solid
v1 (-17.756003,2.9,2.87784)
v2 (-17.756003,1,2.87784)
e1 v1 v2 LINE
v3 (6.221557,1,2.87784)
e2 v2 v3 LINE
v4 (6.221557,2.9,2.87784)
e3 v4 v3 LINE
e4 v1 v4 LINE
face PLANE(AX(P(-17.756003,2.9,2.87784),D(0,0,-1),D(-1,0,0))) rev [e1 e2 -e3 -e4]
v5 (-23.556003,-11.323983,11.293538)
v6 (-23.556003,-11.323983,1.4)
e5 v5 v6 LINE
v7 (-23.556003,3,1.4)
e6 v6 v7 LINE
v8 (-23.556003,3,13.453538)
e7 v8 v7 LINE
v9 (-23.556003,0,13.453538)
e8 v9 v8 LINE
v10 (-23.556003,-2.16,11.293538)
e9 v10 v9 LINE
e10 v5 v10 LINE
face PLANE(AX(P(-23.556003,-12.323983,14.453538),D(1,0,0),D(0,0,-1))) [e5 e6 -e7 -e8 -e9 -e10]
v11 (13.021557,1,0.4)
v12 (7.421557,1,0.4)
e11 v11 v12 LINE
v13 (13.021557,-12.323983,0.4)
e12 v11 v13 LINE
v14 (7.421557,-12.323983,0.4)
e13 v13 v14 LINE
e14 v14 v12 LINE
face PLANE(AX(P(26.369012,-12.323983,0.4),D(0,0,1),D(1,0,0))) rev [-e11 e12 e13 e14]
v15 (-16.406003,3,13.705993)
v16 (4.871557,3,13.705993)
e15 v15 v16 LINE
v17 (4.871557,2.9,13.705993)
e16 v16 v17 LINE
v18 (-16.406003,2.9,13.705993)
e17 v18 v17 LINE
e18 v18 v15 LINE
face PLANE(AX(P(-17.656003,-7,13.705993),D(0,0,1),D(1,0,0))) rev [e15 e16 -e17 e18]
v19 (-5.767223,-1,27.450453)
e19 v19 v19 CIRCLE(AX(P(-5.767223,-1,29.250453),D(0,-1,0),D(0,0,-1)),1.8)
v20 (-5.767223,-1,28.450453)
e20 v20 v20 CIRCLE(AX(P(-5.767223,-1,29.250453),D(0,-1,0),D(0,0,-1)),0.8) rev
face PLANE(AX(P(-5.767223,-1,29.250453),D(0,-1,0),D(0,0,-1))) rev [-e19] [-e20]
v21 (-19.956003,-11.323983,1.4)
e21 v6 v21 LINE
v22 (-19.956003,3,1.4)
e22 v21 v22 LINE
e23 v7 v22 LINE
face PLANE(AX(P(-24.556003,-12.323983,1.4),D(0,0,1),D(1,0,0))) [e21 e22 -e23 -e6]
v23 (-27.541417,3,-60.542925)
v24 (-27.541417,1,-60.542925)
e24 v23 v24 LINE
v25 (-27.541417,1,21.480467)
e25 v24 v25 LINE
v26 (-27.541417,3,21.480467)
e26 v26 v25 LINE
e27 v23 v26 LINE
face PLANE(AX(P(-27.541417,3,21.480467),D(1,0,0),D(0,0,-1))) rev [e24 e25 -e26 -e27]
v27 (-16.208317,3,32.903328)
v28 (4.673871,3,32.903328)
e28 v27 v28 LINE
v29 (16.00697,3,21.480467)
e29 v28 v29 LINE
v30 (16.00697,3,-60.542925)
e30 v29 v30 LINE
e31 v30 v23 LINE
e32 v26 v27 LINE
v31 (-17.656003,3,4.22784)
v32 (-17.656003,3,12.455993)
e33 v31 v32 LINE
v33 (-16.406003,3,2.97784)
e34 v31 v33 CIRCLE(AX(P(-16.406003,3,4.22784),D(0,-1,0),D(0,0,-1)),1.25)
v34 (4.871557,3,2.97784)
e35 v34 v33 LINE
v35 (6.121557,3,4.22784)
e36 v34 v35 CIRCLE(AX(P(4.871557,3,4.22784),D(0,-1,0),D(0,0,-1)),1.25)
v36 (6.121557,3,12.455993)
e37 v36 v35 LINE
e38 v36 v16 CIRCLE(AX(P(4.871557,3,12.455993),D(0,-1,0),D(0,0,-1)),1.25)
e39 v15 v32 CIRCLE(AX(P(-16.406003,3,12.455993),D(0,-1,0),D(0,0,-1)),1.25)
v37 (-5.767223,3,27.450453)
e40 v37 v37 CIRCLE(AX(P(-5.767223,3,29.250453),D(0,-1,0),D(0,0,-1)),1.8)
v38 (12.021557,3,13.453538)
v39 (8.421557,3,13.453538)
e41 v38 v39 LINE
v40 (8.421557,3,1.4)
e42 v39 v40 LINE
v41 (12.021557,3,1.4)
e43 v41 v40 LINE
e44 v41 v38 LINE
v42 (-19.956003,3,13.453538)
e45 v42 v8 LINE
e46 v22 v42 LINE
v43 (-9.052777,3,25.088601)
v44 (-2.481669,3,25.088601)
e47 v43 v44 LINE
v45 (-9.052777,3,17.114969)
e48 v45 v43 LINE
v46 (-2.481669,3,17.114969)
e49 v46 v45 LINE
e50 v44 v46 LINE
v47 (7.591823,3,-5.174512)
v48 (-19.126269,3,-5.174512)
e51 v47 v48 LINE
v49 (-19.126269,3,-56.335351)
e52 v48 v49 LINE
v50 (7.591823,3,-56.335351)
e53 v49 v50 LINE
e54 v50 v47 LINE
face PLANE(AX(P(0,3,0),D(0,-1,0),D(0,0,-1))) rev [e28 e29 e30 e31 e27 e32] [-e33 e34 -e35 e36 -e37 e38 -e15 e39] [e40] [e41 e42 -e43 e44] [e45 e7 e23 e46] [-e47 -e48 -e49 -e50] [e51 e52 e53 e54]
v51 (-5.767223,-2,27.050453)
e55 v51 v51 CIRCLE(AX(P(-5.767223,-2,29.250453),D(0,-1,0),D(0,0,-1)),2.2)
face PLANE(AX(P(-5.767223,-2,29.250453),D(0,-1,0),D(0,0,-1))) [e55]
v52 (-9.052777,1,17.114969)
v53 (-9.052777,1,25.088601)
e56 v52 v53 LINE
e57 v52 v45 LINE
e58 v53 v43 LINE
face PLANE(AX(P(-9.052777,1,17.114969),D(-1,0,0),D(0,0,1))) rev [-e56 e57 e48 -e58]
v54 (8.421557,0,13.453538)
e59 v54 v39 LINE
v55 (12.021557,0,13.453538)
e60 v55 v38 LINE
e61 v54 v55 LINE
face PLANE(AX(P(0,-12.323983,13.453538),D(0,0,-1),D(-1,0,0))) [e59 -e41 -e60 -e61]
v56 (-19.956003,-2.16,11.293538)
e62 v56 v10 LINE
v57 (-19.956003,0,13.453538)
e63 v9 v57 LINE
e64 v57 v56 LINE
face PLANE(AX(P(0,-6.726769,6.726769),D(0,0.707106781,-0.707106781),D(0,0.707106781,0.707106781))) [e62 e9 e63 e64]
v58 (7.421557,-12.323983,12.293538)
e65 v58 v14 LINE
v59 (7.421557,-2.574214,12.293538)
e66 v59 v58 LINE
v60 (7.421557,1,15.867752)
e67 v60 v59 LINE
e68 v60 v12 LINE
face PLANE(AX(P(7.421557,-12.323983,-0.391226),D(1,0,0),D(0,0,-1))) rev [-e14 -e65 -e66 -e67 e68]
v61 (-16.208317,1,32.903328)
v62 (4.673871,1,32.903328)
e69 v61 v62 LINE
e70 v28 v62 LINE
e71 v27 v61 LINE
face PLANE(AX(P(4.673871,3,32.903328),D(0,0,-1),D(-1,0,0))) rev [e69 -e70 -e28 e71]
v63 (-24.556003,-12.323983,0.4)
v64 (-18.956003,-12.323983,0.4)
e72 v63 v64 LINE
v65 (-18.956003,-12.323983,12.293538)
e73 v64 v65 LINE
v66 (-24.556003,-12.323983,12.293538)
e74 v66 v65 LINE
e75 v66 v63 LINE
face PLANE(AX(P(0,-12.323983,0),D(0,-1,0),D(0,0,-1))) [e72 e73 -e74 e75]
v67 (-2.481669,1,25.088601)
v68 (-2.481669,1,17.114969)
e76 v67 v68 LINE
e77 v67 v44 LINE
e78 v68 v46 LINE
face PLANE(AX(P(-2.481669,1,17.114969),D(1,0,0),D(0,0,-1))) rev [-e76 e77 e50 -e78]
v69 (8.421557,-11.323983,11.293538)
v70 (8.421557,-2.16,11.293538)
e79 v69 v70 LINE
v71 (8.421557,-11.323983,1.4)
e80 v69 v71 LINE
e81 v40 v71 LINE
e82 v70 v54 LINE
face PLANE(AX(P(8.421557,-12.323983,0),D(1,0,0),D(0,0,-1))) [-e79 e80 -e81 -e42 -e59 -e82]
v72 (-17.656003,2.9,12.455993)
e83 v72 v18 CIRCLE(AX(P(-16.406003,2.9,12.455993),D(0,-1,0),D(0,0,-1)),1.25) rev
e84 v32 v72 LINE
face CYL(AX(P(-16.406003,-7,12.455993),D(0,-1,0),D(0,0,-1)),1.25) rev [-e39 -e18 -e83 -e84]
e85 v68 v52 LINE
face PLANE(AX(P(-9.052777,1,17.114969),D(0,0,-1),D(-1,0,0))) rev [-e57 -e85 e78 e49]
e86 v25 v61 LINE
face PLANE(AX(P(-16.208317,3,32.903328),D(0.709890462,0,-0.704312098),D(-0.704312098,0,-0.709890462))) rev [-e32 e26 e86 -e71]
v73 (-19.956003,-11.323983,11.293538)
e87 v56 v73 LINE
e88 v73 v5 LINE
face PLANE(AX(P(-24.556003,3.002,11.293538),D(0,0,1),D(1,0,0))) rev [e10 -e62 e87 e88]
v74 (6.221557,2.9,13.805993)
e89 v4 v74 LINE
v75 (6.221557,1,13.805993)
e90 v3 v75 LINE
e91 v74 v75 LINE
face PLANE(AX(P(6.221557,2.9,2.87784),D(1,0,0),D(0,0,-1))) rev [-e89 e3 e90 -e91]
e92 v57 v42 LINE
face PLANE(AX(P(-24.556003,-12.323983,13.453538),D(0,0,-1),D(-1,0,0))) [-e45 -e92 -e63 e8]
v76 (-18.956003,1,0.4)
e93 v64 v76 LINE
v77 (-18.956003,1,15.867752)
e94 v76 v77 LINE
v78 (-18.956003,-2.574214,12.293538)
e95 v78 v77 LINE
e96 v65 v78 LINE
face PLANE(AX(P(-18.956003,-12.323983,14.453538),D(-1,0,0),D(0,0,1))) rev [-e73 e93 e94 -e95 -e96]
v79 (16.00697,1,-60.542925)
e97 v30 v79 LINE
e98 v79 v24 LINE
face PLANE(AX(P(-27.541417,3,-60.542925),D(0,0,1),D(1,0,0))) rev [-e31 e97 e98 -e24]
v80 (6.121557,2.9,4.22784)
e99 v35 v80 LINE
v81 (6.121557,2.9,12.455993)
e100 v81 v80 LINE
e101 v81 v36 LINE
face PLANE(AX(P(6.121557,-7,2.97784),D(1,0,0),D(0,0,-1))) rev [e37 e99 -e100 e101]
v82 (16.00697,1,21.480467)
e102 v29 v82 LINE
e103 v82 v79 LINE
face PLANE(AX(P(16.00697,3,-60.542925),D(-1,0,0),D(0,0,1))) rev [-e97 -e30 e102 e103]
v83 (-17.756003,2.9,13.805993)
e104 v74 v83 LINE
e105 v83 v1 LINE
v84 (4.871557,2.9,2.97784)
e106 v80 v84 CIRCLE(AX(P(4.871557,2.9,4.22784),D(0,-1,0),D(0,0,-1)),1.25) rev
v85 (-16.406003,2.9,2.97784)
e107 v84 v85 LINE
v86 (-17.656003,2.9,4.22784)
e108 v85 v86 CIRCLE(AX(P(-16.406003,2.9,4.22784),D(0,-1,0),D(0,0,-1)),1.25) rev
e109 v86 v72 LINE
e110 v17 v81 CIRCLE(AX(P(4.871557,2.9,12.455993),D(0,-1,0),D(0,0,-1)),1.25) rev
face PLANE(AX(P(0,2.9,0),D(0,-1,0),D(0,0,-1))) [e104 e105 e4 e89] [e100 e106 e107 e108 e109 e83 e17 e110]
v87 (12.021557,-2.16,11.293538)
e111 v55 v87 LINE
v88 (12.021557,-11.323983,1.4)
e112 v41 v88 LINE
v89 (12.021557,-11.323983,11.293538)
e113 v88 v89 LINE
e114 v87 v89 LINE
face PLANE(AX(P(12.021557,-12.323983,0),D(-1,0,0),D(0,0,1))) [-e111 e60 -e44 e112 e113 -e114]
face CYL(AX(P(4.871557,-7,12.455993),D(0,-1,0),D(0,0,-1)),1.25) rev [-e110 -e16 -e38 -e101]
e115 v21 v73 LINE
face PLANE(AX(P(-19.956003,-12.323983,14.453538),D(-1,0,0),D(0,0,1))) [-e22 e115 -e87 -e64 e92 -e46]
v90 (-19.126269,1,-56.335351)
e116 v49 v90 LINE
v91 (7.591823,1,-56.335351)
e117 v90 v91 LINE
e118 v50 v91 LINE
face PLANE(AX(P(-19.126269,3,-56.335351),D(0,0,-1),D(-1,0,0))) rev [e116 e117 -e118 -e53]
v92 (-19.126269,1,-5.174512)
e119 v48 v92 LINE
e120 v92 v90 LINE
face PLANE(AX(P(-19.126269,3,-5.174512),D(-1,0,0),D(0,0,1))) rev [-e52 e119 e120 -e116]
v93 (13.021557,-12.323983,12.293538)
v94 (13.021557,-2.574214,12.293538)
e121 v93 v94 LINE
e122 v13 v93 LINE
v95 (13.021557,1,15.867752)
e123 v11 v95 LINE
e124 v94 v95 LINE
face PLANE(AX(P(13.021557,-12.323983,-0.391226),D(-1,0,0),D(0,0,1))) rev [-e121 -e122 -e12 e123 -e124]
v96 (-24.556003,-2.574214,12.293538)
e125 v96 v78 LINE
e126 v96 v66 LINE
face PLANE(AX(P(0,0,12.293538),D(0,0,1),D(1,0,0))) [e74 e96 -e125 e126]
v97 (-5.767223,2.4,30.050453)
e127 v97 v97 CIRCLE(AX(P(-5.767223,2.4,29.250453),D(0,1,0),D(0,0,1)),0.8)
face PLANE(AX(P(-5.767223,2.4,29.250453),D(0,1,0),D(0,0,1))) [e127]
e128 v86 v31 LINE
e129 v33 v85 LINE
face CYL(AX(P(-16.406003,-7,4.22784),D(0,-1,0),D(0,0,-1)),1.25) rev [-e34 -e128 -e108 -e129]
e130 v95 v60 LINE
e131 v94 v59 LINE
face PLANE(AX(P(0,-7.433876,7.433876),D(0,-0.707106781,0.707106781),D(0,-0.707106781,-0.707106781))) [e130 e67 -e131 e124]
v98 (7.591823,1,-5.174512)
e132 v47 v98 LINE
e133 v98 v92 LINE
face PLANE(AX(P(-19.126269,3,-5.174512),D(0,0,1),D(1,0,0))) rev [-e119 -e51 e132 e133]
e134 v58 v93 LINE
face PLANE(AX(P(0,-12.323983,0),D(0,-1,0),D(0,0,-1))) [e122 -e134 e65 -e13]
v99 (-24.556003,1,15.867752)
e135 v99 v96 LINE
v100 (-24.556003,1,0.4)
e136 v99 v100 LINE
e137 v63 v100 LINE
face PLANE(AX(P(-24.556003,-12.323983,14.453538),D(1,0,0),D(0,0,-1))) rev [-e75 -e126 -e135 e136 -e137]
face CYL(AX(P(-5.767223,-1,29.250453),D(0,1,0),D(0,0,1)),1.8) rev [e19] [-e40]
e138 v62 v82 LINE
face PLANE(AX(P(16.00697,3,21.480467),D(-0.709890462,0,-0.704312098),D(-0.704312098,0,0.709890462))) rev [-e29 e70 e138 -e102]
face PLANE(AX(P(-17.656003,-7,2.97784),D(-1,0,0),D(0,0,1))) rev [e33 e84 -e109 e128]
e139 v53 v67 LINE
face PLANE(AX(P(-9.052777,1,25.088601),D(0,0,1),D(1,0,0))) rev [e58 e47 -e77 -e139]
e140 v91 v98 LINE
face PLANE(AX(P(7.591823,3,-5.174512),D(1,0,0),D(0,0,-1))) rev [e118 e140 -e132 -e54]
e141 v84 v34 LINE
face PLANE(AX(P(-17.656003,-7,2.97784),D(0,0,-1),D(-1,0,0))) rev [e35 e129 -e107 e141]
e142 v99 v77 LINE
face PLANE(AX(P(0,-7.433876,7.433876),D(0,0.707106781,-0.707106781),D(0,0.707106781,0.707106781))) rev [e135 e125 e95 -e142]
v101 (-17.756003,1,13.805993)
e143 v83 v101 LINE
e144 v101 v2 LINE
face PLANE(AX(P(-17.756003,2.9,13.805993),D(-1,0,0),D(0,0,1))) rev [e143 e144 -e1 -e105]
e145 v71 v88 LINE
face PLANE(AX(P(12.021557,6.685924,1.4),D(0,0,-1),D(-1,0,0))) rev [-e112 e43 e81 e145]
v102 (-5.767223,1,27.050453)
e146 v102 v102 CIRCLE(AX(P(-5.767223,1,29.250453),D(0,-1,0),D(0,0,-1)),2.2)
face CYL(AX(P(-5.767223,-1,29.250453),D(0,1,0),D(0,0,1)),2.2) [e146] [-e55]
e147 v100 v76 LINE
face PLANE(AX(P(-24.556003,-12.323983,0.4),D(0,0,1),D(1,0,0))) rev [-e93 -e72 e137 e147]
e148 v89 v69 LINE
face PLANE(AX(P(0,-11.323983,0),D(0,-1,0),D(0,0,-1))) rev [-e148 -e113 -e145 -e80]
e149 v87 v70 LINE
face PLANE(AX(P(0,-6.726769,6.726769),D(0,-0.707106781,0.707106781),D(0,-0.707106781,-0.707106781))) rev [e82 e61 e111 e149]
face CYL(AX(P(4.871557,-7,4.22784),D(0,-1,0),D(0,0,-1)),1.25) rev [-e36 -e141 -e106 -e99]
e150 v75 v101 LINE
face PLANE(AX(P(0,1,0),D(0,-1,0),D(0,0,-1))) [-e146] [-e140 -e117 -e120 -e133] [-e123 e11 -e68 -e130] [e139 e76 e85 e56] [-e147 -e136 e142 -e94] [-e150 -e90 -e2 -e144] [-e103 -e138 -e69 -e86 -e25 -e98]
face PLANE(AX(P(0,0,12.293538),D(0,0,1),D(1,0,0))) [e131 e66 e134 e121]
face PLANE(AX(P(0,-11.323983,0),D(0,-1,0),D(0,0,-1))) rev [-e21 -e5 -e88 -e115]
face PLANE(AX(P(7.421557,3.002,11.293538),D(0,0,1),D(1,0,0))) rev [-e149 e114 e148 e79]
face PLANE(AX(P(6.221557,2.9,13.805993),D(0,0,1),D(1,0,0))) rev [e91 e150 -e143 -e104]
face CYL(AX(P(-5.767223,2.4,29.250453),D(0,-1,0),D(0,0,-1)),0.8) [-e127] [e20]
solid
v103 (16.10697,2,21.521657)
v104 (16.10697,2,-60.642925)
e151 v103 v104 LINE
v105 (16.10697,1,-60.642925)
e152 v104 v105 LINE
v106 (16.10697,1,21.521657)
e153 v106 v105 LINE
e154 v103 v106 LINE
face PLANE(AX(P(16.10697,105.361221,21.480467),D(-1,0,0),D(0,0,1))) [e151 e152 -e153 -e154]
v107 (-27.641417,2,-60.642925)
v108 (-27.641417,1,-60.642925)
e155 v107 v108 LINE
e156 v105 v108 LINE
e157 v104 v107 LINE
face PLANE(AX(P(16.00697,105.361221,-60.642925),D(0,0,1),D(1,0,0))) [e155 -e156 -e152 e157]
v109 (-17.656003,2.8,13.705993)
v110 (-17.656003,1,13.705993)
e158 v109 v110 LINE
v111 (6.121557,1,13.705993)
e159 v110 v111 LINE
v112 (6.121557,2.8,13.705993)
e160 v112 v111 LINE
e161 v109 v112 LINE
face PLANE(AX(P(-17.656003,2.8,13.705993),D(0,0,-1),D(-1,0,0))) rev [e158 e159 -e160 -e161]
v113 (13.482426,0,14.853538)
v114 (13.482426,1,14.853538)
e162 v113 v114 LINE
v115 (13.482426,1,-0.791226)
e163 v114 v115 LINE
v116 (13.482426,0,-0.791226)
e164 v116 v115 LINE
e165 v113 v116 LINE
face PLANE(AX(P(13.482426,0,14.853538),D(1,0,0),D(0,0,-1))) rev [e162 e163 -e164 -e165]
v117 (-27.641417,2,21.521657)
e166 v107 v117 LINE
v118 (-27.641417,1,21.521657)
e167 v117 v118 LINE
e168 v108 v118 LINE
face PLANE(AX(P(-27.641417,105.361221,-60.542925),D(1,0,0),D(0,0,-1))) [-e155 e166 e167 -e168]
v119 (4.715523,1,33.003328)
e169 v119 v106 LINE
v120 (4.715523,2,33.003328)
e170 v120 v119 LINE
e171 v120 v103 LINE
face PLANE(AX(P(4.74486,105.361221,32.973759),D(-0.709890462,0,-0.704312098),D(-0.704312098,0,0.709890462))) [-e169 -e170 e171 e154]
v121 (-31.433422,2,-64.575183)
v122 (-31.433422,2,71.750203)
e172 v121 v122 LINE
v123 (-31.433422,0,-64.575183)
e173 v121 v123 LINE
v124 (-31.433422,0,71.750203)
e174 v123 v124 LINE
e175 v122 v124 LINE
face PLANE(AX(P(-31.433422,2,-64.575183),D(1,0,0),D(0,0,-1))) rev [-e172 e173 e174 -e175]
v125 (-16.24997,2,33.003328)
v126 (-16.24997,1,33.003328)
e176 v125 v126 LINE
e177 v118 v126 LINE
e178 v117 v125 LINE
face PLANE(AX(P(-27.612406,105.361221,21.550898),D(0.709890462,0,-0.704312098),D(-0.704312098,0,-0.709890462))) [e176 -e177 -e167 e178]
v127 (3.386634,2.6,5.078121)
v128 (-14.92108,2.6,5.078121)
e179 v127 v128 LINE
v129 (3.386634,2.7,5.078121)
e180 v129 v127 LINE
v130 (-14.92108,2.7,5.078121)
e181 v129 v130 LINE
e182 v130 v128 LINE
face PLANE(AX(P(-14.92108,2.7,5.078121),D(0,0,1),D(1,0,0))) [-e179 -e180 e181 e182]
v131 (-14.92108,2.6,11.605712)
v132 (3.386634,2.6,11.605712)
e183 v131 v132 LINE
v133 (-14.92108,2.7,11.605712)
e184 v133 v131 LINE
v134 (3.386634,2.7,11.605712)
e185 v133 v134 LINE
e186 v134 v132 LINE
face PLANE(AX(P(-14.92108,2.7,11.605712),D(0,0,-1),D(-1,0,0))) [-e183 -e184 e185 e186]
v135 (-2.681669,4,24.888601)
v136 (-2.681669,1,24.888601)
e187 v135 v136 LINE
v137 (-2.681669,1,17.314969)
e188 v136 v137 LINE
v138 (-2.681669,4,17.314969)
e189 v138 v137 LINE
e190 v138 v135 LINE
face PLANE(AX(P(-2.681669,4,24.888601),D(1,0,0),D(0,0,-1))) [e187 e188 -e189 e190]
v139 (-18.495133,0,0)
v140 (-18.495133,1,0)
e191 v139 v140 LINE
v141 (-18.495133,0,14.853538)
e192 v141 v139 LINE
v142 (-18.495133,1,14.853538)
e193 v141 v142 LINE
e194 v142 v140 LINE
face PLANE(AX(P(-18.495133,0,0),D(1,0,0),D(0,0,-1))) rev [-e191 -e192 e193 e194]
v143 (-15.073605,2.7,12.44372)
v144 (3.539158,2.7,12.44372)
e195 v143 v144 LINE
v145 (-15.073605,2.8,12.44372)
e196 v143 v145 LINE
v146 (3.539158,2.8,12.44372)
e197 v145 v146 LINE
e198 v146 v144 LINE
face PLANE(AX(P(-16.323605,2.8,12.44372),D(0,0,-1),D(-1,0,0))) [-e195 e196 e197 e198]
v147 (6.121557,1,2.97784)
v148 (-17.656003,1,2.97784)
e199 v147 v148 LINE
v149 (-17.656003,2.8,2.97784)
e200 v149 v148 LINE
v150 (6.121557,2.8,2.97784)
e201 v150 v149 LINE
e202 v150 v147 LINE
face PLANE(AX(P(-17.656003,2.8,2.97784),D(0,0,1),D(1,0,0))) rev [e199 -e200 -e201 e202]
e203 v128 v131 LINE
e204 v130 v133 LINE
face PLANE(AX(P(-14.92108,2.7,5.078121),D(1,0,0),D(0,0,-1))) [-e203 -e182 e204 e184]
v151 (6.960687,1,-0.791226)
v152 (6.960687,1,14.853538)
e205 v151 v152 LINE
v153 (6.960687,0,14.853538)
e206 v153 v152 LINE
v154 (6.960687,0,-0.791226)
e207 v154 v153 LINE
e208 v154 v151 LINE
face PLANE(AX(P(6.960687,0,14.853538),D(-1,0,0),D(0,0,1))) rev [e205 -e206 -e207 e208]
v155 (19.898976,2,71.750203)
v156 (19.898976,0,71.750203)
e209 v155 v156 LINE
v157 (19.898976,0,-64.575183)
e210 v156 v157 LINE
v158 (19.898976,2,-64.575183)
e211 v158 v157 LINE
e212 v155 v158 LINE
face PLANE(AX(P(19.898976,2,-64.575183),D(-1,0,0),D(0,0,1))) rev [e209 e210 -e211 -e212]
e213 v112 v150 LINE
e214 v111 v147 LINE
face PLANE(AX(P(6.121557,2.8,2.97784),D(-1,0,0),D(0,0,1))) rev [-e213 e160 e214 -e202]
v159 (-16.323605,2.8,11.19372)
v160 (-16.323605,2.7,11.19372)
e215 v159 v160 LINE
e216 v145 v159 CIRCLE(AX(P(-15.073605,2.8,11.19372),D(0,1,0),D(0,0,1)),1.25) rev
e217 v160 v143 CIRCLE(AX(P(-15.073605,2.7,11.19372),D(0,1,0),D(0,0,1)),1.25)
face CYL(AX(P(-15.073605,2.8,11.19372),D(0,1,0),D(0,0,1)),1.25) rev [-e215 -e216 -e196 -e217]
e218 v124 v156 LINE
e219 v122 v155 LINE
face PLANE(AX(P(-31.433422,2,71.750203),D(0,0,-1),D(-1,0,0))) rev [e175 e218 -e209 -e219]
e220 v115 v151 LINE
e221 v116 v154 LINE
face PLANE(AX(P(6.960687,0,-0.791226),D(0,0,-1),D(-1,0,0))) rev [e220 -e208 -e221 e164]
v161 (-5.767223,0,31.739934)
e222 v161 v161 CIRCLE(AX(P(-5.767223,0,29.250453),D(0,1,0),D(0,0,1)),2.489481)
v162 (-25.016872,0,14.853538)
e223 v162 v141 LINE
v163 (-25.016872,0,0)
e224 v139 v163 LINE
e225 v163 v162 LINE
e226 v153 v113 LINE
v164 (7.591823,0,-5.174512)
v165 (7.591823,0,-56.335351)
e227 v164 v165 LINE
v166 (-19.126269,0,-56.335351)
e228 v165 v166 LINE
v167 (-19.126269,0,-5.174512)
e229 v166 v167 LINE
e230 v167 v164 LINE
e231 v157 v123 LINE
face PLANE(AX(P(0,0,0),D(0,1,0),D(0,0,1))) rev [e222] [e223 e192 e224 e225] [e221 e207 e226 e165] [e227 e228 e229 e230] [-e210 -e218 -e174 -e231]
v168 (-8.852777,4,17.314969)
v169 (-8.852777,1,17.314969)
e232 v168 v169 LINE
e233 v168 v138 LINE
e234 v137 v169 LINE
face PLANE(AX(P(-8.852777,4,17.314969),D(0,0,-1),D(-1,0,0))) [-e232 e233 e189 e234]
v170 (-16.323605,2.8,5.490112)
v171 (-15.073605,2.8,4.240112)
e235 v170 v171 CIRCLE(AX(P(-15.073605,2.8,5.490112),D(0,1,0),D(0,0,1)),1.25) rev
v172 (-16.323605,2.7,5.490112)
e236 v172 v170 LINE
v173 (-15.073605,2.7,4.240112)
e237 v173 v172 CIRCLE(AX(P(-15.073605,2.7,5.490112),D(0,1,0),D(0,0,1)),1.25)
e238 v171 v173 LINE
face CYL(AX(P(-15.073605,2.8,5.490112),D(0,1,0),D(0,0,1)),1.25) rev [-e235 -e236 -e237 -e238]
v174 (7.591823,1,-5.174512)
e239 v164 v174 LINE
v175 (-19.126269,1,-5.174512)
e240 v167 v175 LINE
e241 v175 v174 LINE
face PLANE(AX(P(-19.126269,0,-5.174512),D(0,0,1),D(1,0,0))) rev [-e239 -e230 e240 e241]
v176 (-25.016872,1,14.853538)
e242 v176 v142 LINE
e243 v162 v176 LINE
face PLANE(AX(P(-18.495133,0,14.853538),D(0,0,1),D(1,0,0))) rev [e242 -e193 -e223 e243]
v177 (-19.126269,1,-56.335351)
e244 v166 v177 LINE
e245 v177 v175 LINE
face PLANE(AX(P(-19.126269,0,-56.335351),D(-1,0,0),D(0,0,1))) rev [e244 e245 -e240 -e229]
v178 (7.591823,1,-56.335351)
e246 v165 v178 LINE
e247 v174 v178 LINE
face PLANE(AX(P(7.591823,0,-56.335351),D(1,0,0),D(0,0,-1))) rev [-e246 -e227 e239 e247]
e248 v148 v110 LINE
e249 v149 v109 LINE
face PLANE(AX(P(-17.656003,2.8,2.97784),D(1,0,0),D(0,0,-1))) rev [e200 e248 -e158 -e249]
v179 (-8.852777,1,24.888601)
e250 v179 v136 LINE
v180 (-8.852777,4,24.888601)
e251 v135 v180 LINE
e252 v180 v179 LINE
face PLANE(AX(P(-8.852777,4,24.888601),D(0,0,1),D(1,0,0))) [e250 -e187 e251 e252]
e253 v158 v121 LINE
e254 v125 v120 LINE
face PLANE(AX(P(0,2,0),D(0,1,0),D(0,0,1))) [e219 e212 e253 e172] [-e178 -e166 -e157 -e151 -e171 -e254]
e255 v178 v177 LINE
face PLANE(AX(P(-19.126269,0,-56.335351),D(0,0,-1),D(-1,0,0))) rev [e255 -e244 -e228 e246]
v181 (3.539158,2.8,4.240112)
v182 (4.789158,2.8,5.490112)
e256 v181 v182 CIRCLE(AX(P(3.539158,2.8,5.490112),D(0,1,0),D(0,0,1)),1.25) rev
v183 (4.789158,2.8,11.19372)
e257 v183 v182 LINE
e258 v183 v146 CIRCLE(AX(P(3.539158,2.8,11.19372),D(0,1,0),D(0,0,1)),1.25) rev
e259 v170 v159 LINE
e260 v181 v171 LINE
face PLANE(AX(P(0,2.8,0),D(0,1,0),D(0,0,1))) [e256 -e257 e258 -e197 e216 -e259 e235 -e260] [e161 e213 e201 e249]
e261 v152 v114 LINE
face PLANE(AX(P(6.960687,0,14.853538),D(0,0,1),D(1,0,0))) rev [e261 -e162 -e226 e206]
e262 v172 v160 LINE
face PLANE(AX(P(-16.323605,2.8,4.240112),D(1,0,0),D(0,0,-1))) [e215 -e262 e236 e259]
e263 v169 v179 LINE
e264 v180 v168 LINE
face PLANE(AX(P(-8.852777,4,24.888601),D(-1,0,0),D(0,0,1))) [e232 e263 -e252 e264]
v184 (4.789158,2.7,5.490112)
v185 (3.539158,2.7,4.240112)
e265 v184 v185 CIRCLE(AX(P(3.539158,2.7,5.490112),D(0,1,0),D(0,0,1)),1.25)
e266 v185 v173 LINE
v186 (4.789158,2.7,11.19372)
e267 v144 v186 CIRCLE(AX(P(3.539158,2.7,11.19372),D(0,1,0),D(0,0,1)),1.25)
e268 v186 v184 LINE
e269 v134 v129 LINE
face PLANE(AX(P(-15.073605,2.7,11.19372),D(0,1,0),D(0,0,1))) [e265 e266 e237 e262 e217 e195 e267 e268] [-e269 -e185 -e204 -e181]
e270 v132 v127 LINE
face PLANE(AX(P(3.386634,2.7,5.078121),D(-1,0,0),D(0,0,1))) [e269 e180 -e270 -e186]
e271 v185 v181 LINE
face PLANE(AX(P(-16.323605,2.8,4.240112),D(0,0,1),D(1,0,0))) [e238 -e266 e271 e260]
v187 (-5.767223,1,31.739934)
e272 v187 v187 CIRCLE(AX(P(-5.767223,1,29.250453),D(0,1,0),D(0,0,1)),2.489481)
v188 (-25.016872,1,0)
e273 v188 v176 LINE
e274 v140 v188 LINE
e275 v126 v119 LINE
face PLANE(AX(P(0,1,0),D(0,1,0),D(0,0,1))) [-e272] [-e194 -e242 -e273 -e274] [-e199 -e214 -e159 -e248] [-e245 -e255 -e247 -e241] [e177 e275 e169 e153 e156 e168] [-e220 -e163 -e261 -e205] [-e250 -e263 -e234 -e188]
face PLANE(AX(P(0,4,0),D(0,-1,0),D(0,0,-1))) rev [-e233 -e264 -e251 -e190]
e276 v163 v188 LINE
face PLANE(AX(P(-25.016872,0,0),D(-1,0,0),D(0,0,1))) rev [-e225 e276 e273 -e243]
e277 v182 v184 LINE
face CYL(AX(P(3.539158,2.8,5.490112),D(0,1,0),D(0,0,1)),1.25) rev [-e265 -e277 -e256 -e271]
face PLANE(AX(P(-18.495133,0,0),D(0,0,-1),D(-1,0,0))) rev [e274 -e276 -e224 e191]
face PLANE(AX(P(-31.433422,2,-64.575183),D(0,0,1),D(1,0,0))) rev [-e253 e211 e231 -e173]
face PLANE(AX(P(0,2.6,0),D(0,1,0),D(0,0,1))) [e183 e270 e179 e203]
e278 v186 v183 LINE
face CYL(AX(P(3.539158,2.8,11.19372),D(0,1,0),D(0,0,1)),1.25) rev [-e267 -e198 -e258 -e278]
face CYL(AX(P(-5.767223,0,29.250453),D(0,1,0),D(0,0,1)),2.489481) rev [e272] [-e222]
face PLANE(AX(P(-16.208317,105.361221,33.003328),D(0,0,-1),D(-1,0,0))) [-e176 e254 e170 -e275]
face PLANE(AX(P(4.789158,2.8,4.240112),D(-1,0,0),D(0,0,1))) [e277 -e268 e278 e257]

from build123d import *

# Parameters (mm, degrees)
SKETCH1_W                   = 51.332398317
SKETCH1_H                   = 136.325385694
BOSS_EXTRUDE1_DEPTH         = 2
CUT_EXTRUDE1_DEPTH          = 1
SKETCH3_W                   = 26.718092566
SKETCH3_H                   = 51.160838605
CUT_EXTRUDE2_DEPTH          = 1
SKETCH4_W                   = 20.659186536
SKETCH4_H                   = 13.604488078
BOSS_EXTRUDE2_DEPTH         = 1
SKETCH5_W                   = 6.521739131
SKETCH5_H                   = 14.853538096
SKETCH5_W_2                 = 6.52173913
SKETCH5_H_2                 = 15.644764374
CUT_EXTRUDE3_DEPTH          = 1
SKETCH6_W                   = 6.171107994
SKETCH6_H                   = 7.573632539
CUT_EXTRUDE4_DEPTH          = 1
SKETCH7_R                   = 2.489481066
CUT_EXTRUDE5_DEPTH          = 1
BOSS_EXTRUDE3_DEPTH         = 1
SKETCH10_W                  = 6.171107994
SKETCH10_H                  = 7.573632539
BOSS_EXTRUDE4_DEPTH         = 4
BOSS_EXTRUDE5_DEPTH         = 2
SKETCH12_W                  = 6.571107994
SKETCH12_H                  = 7.973632539
CUT_EXTRUDE6_DEPTH          = 2
SKETCH13_R                  = 1.8
SKETCH13_W                  = 26.718092566
SKETCH13_H                  = 51.160838605
CUT_EXTRUDE9_DEPTH          = 2
SKETCH14_R                  = 2.2
SKETCH14_R_2                = 1.8
BOSS_EXTRUDE11_DEPTH        = 2
SKETCH17_R                  = 2.2
BOSS_EXTRUDE12_DEPTH        = 1
SKETCH18_R                  = 0.8
BOSS_EXTRUDE15_DEPTH        = 3.4
EXTRUDE_THIN3_OUTLINE_W     = 5.6
EXTRUDE_THIN3_OUTLINE_H     = 14.844764374
EXTRUDE_THIN3_OUTLINE_W_2   = 3.6
EXTRUDE_THIN3_OUTLINE_H_2   = 12.844764374
EXTRUDE_THIN3_DEPTH         = 13.32398317
EXTRUDE_THIN3_2_OUTLINE_W   = 5.6
EXTRUDE_THIN3_2_OUTLINE_H   = 14.053538096
EXTRUDE_THIN3_2_OUTLINE_W_2 = 3.6
EXTRUDE_THIN3_2_OUTLINE_H_2 = 12.053538096
EXTRUDE_THIN3_2_DEPTH       = 13.32398317
SKETCH26_W                  = 3.6
SKETCH26_H                  = 12.053538096
SKETCH26_H_2                = 12.844764374
CUT_EXTRUDE12_DEPTH         = 13.32398317
SKETCH27_W                  = 5.6
SKETCH27_H                  = 14.053538096
BOSS_EXTRUDE18_DEPTH        = 1
SKETCH27_W_2                = 5.570395019
SKETCH27_H_2                = 14.844764374
BOSS_EXTRUDE18_2_DEPTH      = 1
SKETCH28_W                  = 20.659186536
SKETCH28_H                  = 13.604488078
CUT_EXTRUDE13_DEPTH         = 1
SKETCH29_W                  = 23.777559608
SKETCH29_H                  = 10.728152402
CUT_EXTRUDE15_DEPTH         = 10
SKETCH30_W                  = 23.777559608
SKETCH30_H                  = 10.728152402
SKETCH30_W_2                = 21.112762974
SKETCH30_H_2                = 8.203608222
BOSS_EXTRUDE20_DEPTH        = 1.8
SKETCH31_W                  = 21.112762974
SKETCH31_H                  = 8.203608222
BOSS_EXTRUDE21_DEPTH        = 1.6
SKETCH35_W                  = 23.977559608
SKETCH35_H                  = 10.928152402
CUT_EXTRUDE21_DEPTH         = 1.9
FILLET2_R                   = 1.25
FILLET3_R                   = 1.25
SKETCH37_W                  = 18.307713885
SKETCH37_H                  = 6.527591392
CUT_EXTRUDE22_DEPTH         = 0.1
SKETCH41_W                  = 18.307713885
SKETCH41_H                  = 6.527591392
BOSS_EXTRUDE27_DEPTH        = 0.1
SKETCH43_W                  = 18.307713885
SKETCH43_H                  = 6.527591392
BOSS_EXTRUDE28_DEPTH        = 0.1
CUT_EXTRUDE24_DEPTH         = 40.1
SKETCH51_W                  = 5.6
SKETCH51_H                  = 4.468914857
BOSS_EXTRUDE29_DEPTH        = 1
BOSS_EXTRUDE29_2_DEPTH      = 1
SKETCH52_W                  = 5.6
SKETCH52_H                  = 1
BOSS_EXTRUDE30_DEPTH        = 2.5
BOSS_EXTRUDE30_2_DEPTH      = 2.5
SKETCH53_W                  = 5.6
SKETCH53_H                  = 1
BOSS_EXTRUDE31_DEPTH        = 1
BOSS_EXTRUDE32_REACH        = 81.818
SKETCH54_W                  = 5.6
SKETCH54_H                  = 1
SKETCH55_W                  = 3.6
SKETCH55_H                  = 0.791226278
BOSS_EXTRUDE33_DEPTH        = 14.323983
SKETCH56_W                  = 0.791226278
SKETCH56_H                  = 13.32398317
CUT_EXTRUDE25_DEPTH         = 5.6
CUT_EXTRUDE_THIN1_DEPTH     = 1


with BuildPart() as part:
    # Sketch1 → Boss-Extrude1 (new body)
    with BuildSketch(Plane(origin=(0, 0, 0), x_dir=(1, 0, 0), z_dir=(0, 1, 0))):
        with Locations((-5.767223106, -3.58751015)):
            Rectangle(SKETCH1_W, SKETCH1_H)
    extrude(amount=BOSS_EXTRUDE1_DEPTH)

    # Sketch2 → Cut-Extrude1 (cut)
    with BuildSketch(Plane(origin=(0, 2, 0), x_dir=(1, 0, 0), z_dir=(0, 1, 0))):
        Polygon((-27.541416655, -30.445855171), (-27.541416655, 60.542924633), (16.006970442, 60.542924633), (16.006970442, -30.445855171), (4.678976052, -41.666051524), (-16.213422265, -41.666051524), align=None)
    extrude(amount=-CUT_EXTRUDE1_DEPTH, mode=Mode.SUBTRACT)

    # Sketch3 → Cut-Extrude2 (cut)
    with BuildSketch(Plane(origin=(0, 1, 0), x_dir=(1, 0, 0), z_dir=(0, 1, 0))):
        with Locations((-5.767223107, 30.754931698)):
            Rectangle(SKETCH3_W, SKETCH3_H)
    extrude(amount=-CUT_EXTRUDE2_DEPTH, mode=Mode.SUBTRACT)

    # Sketch4 → Boss-Extrude2 (add)
    with BuildSketch(Plane(origin=(0, 1, 0), x_dir=(1, 0, 0), z_dir=(0, 1, 0))):
        with Locations((-5.767223107, -7.988180452)):
            Rectangle(SKETCH4_W, SKETCH4_H)
    extrude(amount=BOSS_EXTRUDE2_DEPTH)

    # Sketch5 → Cut-Extrude3 (cut)
    with BuildSketch(Plane(origin=(0, 1, 0), x_dir=(1, 0, 0), z_dir=(0, 1, 0))):
        with Locations((-21.756002911, -7.426769048)):
            Rectangle(SKETCH5_W, SKETCH5_H)
        with Locations((10.221556697, -7.031155909)):
            Rectangle(SKETCH5_W_2, SKETCH5_H_2)
    extrude(amount=-CUT_EXTRUDE3_DEPTH, mode=Mode.SUBTRACT)

    # Sketch6 → Cut-Extrude4 (cut)
    with BuildSketch(Plane(origin=(0, 1, 0), x_dir=(1, 0, 0), z_dir=(0, 1, 0))):
        with Locations((-5.767223107, -21.101784941)):
            Rectangle(SKETCH6_W, SKETCH6_H)
    extrude(amount=-CUT_EXTRUDE4_DEPTH, mode=Mode.SUBTRACT)

    # Sketch7 → Cut-Extrude5 (cut)
    with BuildSketch(Plane(origin=(0, 1, 0), x_dir=(1, 0, 0), z_dir=(0, 1, 0))):
        with Locations(Location((-5.767223107, -29.250452542, 0), (0, 0, 270))):
            Circle(SKETCH7_R)
    extrude(amount=-CUT_EXTRUDE5_DEPTH, mode=Mode.SUBTRACT)

    # Sketch8 → Boss-Extrude3 (add)
    with BuildSketch(Plane(origin=(0, 1, 0), x_dir=(1, 0, 0), z_dir=(0, 1, 0))):
        Polygon((-27.541416655, -21.480466567), (-27.541416655, -30.445855171), (-16.213422265, -41.666051524), (4.678976052, -41.666051524), (16.006970442, -30.445855171), (16.006970442, -21.480466567), (4.673870862, -32.903327717), (-16.208317076, -32.903327717), align=None)
    extrude(amount=BOSS_EXTRUDE3_DEPTH)

    # Sketch10 → Boss-Extrude4 (add)
    with BuildSketch(Plane.XZ):
        with Locations((-5.767223107, 21.101784941)):
            Rectangle(SKETCH10_W, SKETCH10_H)
    extrude(amount=-BOSS_EXTRUDE4_DEPTH)

    # Sketch28 → Cut-Extrude13 (cut)
    with BuildSketch(Plane(origin=(0, 2, 0), x_dir=(1, 0, 0), z_dir=(0, 1, 0))):
        with Locations((-5.767223107, -7.988180452)):
            Rectangle(SKETCH28_W, SKETCH28_H)
    extrude(amount=-CUT_EXTRUDE13_DEPTH, mode=Mode.SUBTRACT)


with BuildPart() as body_2:
    # Sketch11 → Boss-Extrude5 (new body)
    with BuildSketch(Plane(origin=(0, 1, 0), x_dir=(1, 0, 0), z_dir=(0, 1, 0))):
        Polygon((-27.541416655, 60.542924633), (16.006970442, 60.542924633), (16.006970442, -21.480466567), (4.673870862, -32.903327717), (-16.208317076, -32.903327717), (-27.541416655, -21.480466567), align=None)
    extrude(amount=BOSS_EXTRUDE5_DEPTH)

    # Sketch12 → Cut-Extrude6 (cut)
    with BuildSketch(Plane(origin=(0, 3, 0), x_dir=(1, 0, 0), z_dir=(0, 1, 0))):
        with Locations((-5.767223107, -21.10178494)):
            Rectangle(SKETCH12_W, SKETCH12_H)
    extrude(amount=-CUT_EXTRUDE6_DEPTH, mode=Mode.SUBTRACT)

    # Sketch13 → Cut-Extrude9 (cut)
    with BuildSketch(Plane.XZ.offset(-1)):
        with Locations(Location((-5.767223107, 29.250452542, 0), (0, 0, 270))):
            Circle(SKETCH13_R)
        with Locations((-5.767223107, -30.754931698)):
            Rectangle(SKETCH13_W, SKETCH13_H)
    extrude(amount=-CUT_EXTRUDE9_DEPTH, mode=Mode.SUBTRACT)


with BuildPart() as body_3:
    # Sketch14 → Boss-Extrude11 (new body)
    with BuildSketch(Plane.XZ.offset(-1)):
        with Locations(Location((-5.767223107, 29.250452542, 0), (0, 0, 270))):
            Circle(SKETCH14_R)
        with Locations(Location((-5.767223107, 29.250452542, 0), (0, 0, 270))):
            Circle(SKETCH14_R_2, mode=Mode.SUBTRACT)
    extrude(amount=BOSS_EXTRUDE11_DEPTH)

    # Combine1: union body 2
    add(body_2.part)

    # Sketch17 → Boss-Extrude12 (add)
    with BuildSketch(Plane.XZ.offset(1)):
        with Locations(Location((-5.767223107, 29.250452542, 0), (0, 0, 270))):
            Circle(SKETCH17_R)
    extrude(amount=BOSS_EXTRUDE12_DEPTH)


with BuildPart() as body_3_2:
    # Sketch18 → Boss-Extrude15 (new body)
    with BuildSketch(Plane(origin=(0, -1, 0), x_dir=(1, 0, 0), z_dir=(0, 1, 0))):
        with Locations(Location((-5.767223107, -29.250452542, 0), (0, 0, 270))):
            Circle(SKETCH18_R)
    extrude(amount=BOSS_EXTRUDE15_DEPTH)


with BuildPart() as body_3_1:
    add(body_3.part)

    # Combine3: union body 3 2
    add(body_3_2.part)

    # Sketch26 → Cut-Extrude12 (cut)
    with BuildSketch(Plane.XZ.offset(-1)):
        with Locations((-21.756002911, 7.426769048)):
            Rectangle(SKETCH26_W, SKETCH26_H)
        with Locations((10.221556697, 7.031155909)):
            Rectangle(SKETCH26_W, SKETCH26_H_2)
    extrude(amount=-CUT_EXTRUDE12_DEPTH, mode=Mode.SUBTRACT)


with BuildPart() as body_3_3:
    # Extrude-Thin3: read off the stored shape, not the designer's step
    # Extrude-Thin3 outline → Extrude-Thin3 (new body)
    with BuildSketch(Plane.XZ.offset(-1)):
        with Locations((10.221556697, 7.031155909)):
            Rectangle(EXTRUDE_THIN3_OUTLINE_W, EXTRUDE_THIN3_OUTLINE_H)
        with Locations((10.221556697, 7.031155909)):
            Rectangle(EXTRUDE_THIN3_OUTLINE_W_2, EXTRUDE_THIN3_OUTLINE_H_2, mode=Mode.SUBTRACT)
    extrude(amount=EXTRUDE_THIN3_DEPTH)


with BuildPart() as body_4:
    # Extrude-Thin3 2 outline → Extrude-Thin3 2 (new body)
    with BuildSketch(Plane.XZ.offset(-1)):
        with Locations((-21.756002911, 7.426769048)):
            Rectangle(EXTRUDE_THIN3_2_OUTLINE_W, EXTRUDE_THIN3_2_OUTLINE_H)
        with Locations((-21.756002911, 7.426769048)):
            Rectangle(EXTRUDE_THIN3_2_OUTLINE_W_2, EXTRUDE_THIN3_2_OUTLINE_H_2, mode=Mode.SUBTRACT)
    extrude(amount=EXTRUDE_THIN3_2_DEPTH)


with BuildPart() as body_5:
    # Sketch27 → Boss-Extrude18 (new body)
    with BuildSketch(Plane.XZ.offset(12.32398317)):
        with Locations((-21.756002911, 7.426769048)):
            Rectangle(SKETCH27_W, SKETCH27_H)
    extrude(amount=-BOSS_EXTRUDE18_DEPTH)


with BuildPart() as body_6:
    # Sketch27 → Boss-Extrude18 2 (new body)
    with BuildSketch(Plane.XZ.offset(12.32398317)):
        with Locations((10.206754207, 7.031155909)):
            Rectangle(SKETCH27_W_2, SKETCH27_H_2)
    extrude(amount=-BOSS_EXTRUDE18_2_DEPTH)


with BuildPart() as body_4_1:
    add(body_4.part)

    # Combine4: union body 3 3, body 3, body 5, body 6
    add(body_3_3.part)
    add(body_3_1.part)
    add(body_5.part)
    add(body_6.part)

    # Sketch29 → Cut-Extrude15 (cut)
    with BuildSketch(Plane(origin=(0, 3, 0), x_dir=(1, 0, 0), z_dir=(0, 1, 0))):
        with Locations((-5.767223107, -8.341916313)):
            Rectangle(SKETCH29_W, SKETCH29_H)
    extrude(amount=-CUT_EXTRUDE15_DEPTH, mode=Mode.SUBTRACT)

    # Sketch35 → Cut-Extrude21 (cut)
    with BuildSketch(Plane.XZ.offset(-1)):
        with Locations((-5.767223107, 8.341916313)):
            Rectangle(SKETCH35_W, SKETCH35_H)
    extrude(amount=-CUT_EXTRUDE21_DEPTH, mode=Mode.SUBTRACT)

    # Fillet2
    fillet2_edges = [body_4_1.edges().sort_by_distance(p)[0] for p in [
        (-17.656002911, 2.95, 13.705992514),
        (6.121556697, 2.95, 13.705992514),
        (6.121556697, 2.95, 2.977840112),
        (-17.656002911, 2.95, 2.977840112),
    ]]
    fillet(fillet2_edges, radius=FILLET2_R)

    # Sketch50 → Cut-Extrude24 (cut)
    with BuildSketch(Plane(origin=(13.021556697, 0, 0), x_dir=(0, 0, -1), z_dir=(1, 0, 0))):
        Polygon((-14.453538096, 1), (-11.293538096, -2.16), (-11.293538096, -12.32398317), (-14.453538096, -12.32398317), align=None)
    extrude(amount=-CUT_EXTRUDE24_DEPTH, mode=Mode.SUBTRACT)


with BuildPart() as body_3_4:
    # Sketch30 → Boss-Extrude20 (new body)
    with BuildSketch(Plane(origin=(0, 1, 0), x_dir=(1, 0, 0), z_dir=(0, 1, 0))):
        with Locations((-5.767223107, -8.341916313)):
            Rectangle(SKETCH30_W, SKETCH30_H)
        with Locations((-5.767223107, -8.341916313)):
            Rectangle(SKETCH30_W_2, SKETCH30_H_2, mode=Mode.SUBTRACT)
    extrude(amount=BOSS_EXTRUDE20_DEPTH)


with BuildPart() as body_4_2:
    # Sketch31 → Boss-Extrude21 (new body)
    with BuildSketch(Plane(origin=(0, 1, 0), x_dir=(1, 0, 0), z_dir=(0, 1, 0))):
        with Locations((-5.767223107, -8.341916313)):
            Rectangle(SKETCH31_W, SKETCH31_H)
    extrude(amount=BOSS_EXTRUDE21_DEPTH)


with BuildPart() as part_1:
    add(part.part)

    # Combine5: union body 3 4, body 4 2
    add(body_3_4.part)
    add(body_4_2.part)

    # Fillet3
    fillet3_edges = [part_1.edges().sort_by_distance(p)[0] for p in [
        (-16.323604594, 2.7, 12.443720424),
        (4.78915838, 2.7, 12.443720424),
        (4.78915838, 2.7, 4.240112202),
        (-16.323604594, 2.7, 4.240112202),
    ]]
    fillet(fillet3_edges, radius=FILLET3_R)

    # Sketch37 → Cut-Extrude22 (cut)
    with BuildSketch(Plane(origin=(0, 2.6, 0), x_dir=(1, 0, 0), z_dir=(0, 1, 0))):
        with Locations((-5.767223107, -8.341916313)):
            Rectangle(SKETCH37_W, SKETCH37_H)
    extrude(amount=-CUT_EXTRUDE22_DEPTH, mode=Mode.SUBTRACT)


with BuildPart() as body_3_5:
    # Sketch41 → Boss-Extrude27 (new body)
    with BuildSketch(Plane(origin=(0, 2.6, 0), x_dir=(1, 0, 0), z_dir=(0, 1, 0))):
        with BuildLine():
            Line((-15.073604594, -12.443720424), (3.53915838, -12.443720424))
            ThreePointArc((3.53915838, -12.443720424), (4.423041856, -12.077603901), (4.78915838, -11.193720424))
            Line((4.78915838, -11.193720424), (4.78915838, -5.490112202))
            ThreePointArc((4.78915838, -5.490112202), (4.423041856, -4.606228725), (3.53915838, -4.240112202))
            Line((3.53915838, -4.240112202), (-15.073604594, -4.240112202))
            ThreePointArc((-15.073604594, -4.240112202), (-15.95748807, -4.606228725), (-16.323604594, -5.490112202))
            Line((-16.323604594, -5.490112202), (-16.323604594, -11.193720424))
            ThreePointArc((-16.323604594, -11.193720424), (-15.95748807, -12.077603901), (-15.073604594, -12.443720424))
        make_face()
        with Locations((-5.767223107, -8.341916313)):
            Rectangle(SKETCH41_W, SKETCH41_H, mode=Mode.SUBTRACT)
    extrude(amount=BOSS_EXTRUDE27_DEPTH)

    # Combine6: union part
    add(part_1.part)


with BuildPart() as body_3_6:
    # Sketch43 → Boss-Extrude28 (new body)
    with BuildSketch(Plane(origin=(0, 2.5, 0), x_dir=(1, 0, 0), z_dir=(0, 1, 0))):
        with Locations((-5.767223107, -8.341916313)):
            Rectangle(SKETCH43_W, SKETCH43_H)
    extrude(amount=BOSS_EXTRUDE28_DEPTH)

    # Combine7: union body 3 5
    add(body_3_5.part)

    # Sketch58 → Cut-Extrude-Thin1 (cut)
    with BuildSketch(Plane(origin=(0, 1, 0), x_dir=(1, 0, 0), z_dir=(0, 1, 0))):
        Polygon((-16.249969686, -33.003327717), (4.715523472, -33.003327717), (16.106970442, -21.521657048), (16.106970442, 60.642924633), (-27.641416655, 60.642924633), (-27.641416655, -21.521657048), align=None)
        Polygon((-16.208317076, -32.903327717), (4.673870862, -32.903327717), (16.006970442, -21.480466567), (16.006970442, 60.542924633), (-27.541416655, 60.542924633), (-27.541416655, -21.480466567), align=None, mode=Mode.SUBTRACT)
    extrude(amount=CUT_EXTRUDE_THIN1_DEPTH, mode=Mode.SUBTRACT)


with BuildPart() as body_3_7:
    # Sketch51 → Boss-Extrude29 (new body)
    with BuildSketch(Plane(origin=(0, -6.726769048, 6.726769048), x_dir=(1, 0, 0), z_dir=(0, -0.7071067811865475, 0.7071067811865476))):
        with Locations((10.221556697, 8.692844153)):
            Rectangle(SKETCH51_W, SKETCH51_H)
    extrude(amount=BOSS_EXTRUDE29_DEPTH)


with BuildPart() as body_4_3:
    # Sketch51 → Boss-Extrude29 2 (new body)
    with BuildSketch(Plane(origin=(0, -6.726769048, 6.726769048), x_dir=(1, 0, 0), z_dir=(0, -0.7071067811865475, 0.7071067811865476))):
        with Locations((-21.756002911, 8.692844153)):
            Rectangle(SKETCH51_W, SKETCH51_H)
    extrude(amount=BOSS_EXTRUDE29_2_DEPTH)


with BuildPart() as body_5_2:
    # Sketch52 → Boss-Extrude30 (new body)
    with BuildSketch(Plane(origin=(0, 7.726769048, 7.726769048), x_dir=(1, 0, 0), z_dir=(0, 0.7071067811865476, 0.7071067811865475))):
        with Locations((10.221556697, -10.013088019)):
            Rectangle(SKETCH52_W, SKETCH52_H)
    extrude(amount=BOSS_EXTRUDE30_DEPTH)


with BuildPart() as body_6_2:
    # Sketch52 → Boss-Extrude30 2 (new body)
    with BuildSketch(Plane(origin=(0, 7.726769048, 7.726769048), x_dir=(1, 0, 0), z_dir=(0, 0.7071067811865476, 0.7071067811865475))):
        with Locations((-21.756002911, -10.013088019)):
            Rectangle(SKETCH52_W, SKETCH52_H)
    extrude(amount=BOSS_EXTRUDE30_2_DEPTH)


with BuildPart() as body_4_4:
    add(body_4_1.part)

    # Combine8: union body 3 7, body 4 3, body 5 2, body 6 2
    add(body_3_7.part)
    add(body_4_3.part)
    add(body_5_2.part)
    add(body_6_2.part)

    # Sketch53 → Boss-Extrude31 (add)
    with BuildSketch(Plane.XY.offset(11.293538096)):
        with Locations((-21.756002911, -11.82398317)):
            Rectangle(SKETCH53_W, SKETCH53_H)
        with Locations((10.221556697, -11.82398317)):
            Rectangle(SKETCH53_W, SKETCH53_H)
    extrude(amount=BOSS_EXTRUDE31_DEPTH)


with BuildPart() as body_3_8:

    # Sketch54 → Boss-Extrude32 (new, up to next)
    with BuildSketch(Plane(origin=(0, -11.32398317, 0), x_dir=(1, 0, 0), z_dir=(0, 1, 0)), mode=Mode.PRIVATE) as boss_extrude32_sk1:
        with Locations((-21.756002911, -11.793538096)):
            Rectangle(SKETCH54_W, SKETCH54_H)
    boss_extrude32_tool1 = extrude(boss_extrude32_sk1.sketch, amount=BOSS_EXTRUDE32_REACH, mode=Mode.PRIVATE) - body_4_4.part
    # Sketch54 → Boss-Extrude32 (new, up to next)
    with BuildSketch(Plane(origin=(0, -11.32398317, 0), x_dir=(1, 0, 0), z_dir=(0, 1, 0)), mode=Mode.PRIVATE) as boss_extrude32_sk2:
        with Locations((10.221556697, -11.793538096)):
            Rectangle(SKETCH54_W, SKETCH54_H)
    boss_extrude32_tool2 = extrude(boss_extrude32_sk2.sketch, amount=BOSS_EXTRUDE32_REACH, mode=Mode.PRIVATE) - body_4_4.part
    add(boss_extrude32_tool1.solids().sort_by_distance((-21.756003, -11.323983, 11.793538))[0])
    add(boss_extrude32_tool2.solids().sort_by_distance((10.221557, -11.323983, 11.793538))[0])


with BuildPart() as body_4_5:
    add(body_4_4.part)

    # Combine9: union body 3 8
    add(body_3_8.part)

    # Sketch55 → Boss-Extrude33 (add)
    with BuildSketch(Plane(origin=(0, -11.32398317, 0), x_dir=(1, 0, 0), z_dir=(0, 1, 0))):
        with Locations((10.221556697, -1.004386861)):
            Rectangle(SKETCH55_W, SKETCH55_H)
    extrude(amount=BOSS_EXTRUDE33_DEPTH)

    # Sketch56 → Cut-Extrude25 (cut)
    with BuildSketch(Plane.ZY.offset(-7.421556697)):
        with Locations((0.004386861, -5.661991585)):
            Rectangle(SKETCH56_W, SKETCH56_H)
    extrude(amount=-CUT_EXTRUDE25_DEPTH, mode=Mode.SUBTRACT)


solid = Compound([body_3_6.part, body_4_5.part])
